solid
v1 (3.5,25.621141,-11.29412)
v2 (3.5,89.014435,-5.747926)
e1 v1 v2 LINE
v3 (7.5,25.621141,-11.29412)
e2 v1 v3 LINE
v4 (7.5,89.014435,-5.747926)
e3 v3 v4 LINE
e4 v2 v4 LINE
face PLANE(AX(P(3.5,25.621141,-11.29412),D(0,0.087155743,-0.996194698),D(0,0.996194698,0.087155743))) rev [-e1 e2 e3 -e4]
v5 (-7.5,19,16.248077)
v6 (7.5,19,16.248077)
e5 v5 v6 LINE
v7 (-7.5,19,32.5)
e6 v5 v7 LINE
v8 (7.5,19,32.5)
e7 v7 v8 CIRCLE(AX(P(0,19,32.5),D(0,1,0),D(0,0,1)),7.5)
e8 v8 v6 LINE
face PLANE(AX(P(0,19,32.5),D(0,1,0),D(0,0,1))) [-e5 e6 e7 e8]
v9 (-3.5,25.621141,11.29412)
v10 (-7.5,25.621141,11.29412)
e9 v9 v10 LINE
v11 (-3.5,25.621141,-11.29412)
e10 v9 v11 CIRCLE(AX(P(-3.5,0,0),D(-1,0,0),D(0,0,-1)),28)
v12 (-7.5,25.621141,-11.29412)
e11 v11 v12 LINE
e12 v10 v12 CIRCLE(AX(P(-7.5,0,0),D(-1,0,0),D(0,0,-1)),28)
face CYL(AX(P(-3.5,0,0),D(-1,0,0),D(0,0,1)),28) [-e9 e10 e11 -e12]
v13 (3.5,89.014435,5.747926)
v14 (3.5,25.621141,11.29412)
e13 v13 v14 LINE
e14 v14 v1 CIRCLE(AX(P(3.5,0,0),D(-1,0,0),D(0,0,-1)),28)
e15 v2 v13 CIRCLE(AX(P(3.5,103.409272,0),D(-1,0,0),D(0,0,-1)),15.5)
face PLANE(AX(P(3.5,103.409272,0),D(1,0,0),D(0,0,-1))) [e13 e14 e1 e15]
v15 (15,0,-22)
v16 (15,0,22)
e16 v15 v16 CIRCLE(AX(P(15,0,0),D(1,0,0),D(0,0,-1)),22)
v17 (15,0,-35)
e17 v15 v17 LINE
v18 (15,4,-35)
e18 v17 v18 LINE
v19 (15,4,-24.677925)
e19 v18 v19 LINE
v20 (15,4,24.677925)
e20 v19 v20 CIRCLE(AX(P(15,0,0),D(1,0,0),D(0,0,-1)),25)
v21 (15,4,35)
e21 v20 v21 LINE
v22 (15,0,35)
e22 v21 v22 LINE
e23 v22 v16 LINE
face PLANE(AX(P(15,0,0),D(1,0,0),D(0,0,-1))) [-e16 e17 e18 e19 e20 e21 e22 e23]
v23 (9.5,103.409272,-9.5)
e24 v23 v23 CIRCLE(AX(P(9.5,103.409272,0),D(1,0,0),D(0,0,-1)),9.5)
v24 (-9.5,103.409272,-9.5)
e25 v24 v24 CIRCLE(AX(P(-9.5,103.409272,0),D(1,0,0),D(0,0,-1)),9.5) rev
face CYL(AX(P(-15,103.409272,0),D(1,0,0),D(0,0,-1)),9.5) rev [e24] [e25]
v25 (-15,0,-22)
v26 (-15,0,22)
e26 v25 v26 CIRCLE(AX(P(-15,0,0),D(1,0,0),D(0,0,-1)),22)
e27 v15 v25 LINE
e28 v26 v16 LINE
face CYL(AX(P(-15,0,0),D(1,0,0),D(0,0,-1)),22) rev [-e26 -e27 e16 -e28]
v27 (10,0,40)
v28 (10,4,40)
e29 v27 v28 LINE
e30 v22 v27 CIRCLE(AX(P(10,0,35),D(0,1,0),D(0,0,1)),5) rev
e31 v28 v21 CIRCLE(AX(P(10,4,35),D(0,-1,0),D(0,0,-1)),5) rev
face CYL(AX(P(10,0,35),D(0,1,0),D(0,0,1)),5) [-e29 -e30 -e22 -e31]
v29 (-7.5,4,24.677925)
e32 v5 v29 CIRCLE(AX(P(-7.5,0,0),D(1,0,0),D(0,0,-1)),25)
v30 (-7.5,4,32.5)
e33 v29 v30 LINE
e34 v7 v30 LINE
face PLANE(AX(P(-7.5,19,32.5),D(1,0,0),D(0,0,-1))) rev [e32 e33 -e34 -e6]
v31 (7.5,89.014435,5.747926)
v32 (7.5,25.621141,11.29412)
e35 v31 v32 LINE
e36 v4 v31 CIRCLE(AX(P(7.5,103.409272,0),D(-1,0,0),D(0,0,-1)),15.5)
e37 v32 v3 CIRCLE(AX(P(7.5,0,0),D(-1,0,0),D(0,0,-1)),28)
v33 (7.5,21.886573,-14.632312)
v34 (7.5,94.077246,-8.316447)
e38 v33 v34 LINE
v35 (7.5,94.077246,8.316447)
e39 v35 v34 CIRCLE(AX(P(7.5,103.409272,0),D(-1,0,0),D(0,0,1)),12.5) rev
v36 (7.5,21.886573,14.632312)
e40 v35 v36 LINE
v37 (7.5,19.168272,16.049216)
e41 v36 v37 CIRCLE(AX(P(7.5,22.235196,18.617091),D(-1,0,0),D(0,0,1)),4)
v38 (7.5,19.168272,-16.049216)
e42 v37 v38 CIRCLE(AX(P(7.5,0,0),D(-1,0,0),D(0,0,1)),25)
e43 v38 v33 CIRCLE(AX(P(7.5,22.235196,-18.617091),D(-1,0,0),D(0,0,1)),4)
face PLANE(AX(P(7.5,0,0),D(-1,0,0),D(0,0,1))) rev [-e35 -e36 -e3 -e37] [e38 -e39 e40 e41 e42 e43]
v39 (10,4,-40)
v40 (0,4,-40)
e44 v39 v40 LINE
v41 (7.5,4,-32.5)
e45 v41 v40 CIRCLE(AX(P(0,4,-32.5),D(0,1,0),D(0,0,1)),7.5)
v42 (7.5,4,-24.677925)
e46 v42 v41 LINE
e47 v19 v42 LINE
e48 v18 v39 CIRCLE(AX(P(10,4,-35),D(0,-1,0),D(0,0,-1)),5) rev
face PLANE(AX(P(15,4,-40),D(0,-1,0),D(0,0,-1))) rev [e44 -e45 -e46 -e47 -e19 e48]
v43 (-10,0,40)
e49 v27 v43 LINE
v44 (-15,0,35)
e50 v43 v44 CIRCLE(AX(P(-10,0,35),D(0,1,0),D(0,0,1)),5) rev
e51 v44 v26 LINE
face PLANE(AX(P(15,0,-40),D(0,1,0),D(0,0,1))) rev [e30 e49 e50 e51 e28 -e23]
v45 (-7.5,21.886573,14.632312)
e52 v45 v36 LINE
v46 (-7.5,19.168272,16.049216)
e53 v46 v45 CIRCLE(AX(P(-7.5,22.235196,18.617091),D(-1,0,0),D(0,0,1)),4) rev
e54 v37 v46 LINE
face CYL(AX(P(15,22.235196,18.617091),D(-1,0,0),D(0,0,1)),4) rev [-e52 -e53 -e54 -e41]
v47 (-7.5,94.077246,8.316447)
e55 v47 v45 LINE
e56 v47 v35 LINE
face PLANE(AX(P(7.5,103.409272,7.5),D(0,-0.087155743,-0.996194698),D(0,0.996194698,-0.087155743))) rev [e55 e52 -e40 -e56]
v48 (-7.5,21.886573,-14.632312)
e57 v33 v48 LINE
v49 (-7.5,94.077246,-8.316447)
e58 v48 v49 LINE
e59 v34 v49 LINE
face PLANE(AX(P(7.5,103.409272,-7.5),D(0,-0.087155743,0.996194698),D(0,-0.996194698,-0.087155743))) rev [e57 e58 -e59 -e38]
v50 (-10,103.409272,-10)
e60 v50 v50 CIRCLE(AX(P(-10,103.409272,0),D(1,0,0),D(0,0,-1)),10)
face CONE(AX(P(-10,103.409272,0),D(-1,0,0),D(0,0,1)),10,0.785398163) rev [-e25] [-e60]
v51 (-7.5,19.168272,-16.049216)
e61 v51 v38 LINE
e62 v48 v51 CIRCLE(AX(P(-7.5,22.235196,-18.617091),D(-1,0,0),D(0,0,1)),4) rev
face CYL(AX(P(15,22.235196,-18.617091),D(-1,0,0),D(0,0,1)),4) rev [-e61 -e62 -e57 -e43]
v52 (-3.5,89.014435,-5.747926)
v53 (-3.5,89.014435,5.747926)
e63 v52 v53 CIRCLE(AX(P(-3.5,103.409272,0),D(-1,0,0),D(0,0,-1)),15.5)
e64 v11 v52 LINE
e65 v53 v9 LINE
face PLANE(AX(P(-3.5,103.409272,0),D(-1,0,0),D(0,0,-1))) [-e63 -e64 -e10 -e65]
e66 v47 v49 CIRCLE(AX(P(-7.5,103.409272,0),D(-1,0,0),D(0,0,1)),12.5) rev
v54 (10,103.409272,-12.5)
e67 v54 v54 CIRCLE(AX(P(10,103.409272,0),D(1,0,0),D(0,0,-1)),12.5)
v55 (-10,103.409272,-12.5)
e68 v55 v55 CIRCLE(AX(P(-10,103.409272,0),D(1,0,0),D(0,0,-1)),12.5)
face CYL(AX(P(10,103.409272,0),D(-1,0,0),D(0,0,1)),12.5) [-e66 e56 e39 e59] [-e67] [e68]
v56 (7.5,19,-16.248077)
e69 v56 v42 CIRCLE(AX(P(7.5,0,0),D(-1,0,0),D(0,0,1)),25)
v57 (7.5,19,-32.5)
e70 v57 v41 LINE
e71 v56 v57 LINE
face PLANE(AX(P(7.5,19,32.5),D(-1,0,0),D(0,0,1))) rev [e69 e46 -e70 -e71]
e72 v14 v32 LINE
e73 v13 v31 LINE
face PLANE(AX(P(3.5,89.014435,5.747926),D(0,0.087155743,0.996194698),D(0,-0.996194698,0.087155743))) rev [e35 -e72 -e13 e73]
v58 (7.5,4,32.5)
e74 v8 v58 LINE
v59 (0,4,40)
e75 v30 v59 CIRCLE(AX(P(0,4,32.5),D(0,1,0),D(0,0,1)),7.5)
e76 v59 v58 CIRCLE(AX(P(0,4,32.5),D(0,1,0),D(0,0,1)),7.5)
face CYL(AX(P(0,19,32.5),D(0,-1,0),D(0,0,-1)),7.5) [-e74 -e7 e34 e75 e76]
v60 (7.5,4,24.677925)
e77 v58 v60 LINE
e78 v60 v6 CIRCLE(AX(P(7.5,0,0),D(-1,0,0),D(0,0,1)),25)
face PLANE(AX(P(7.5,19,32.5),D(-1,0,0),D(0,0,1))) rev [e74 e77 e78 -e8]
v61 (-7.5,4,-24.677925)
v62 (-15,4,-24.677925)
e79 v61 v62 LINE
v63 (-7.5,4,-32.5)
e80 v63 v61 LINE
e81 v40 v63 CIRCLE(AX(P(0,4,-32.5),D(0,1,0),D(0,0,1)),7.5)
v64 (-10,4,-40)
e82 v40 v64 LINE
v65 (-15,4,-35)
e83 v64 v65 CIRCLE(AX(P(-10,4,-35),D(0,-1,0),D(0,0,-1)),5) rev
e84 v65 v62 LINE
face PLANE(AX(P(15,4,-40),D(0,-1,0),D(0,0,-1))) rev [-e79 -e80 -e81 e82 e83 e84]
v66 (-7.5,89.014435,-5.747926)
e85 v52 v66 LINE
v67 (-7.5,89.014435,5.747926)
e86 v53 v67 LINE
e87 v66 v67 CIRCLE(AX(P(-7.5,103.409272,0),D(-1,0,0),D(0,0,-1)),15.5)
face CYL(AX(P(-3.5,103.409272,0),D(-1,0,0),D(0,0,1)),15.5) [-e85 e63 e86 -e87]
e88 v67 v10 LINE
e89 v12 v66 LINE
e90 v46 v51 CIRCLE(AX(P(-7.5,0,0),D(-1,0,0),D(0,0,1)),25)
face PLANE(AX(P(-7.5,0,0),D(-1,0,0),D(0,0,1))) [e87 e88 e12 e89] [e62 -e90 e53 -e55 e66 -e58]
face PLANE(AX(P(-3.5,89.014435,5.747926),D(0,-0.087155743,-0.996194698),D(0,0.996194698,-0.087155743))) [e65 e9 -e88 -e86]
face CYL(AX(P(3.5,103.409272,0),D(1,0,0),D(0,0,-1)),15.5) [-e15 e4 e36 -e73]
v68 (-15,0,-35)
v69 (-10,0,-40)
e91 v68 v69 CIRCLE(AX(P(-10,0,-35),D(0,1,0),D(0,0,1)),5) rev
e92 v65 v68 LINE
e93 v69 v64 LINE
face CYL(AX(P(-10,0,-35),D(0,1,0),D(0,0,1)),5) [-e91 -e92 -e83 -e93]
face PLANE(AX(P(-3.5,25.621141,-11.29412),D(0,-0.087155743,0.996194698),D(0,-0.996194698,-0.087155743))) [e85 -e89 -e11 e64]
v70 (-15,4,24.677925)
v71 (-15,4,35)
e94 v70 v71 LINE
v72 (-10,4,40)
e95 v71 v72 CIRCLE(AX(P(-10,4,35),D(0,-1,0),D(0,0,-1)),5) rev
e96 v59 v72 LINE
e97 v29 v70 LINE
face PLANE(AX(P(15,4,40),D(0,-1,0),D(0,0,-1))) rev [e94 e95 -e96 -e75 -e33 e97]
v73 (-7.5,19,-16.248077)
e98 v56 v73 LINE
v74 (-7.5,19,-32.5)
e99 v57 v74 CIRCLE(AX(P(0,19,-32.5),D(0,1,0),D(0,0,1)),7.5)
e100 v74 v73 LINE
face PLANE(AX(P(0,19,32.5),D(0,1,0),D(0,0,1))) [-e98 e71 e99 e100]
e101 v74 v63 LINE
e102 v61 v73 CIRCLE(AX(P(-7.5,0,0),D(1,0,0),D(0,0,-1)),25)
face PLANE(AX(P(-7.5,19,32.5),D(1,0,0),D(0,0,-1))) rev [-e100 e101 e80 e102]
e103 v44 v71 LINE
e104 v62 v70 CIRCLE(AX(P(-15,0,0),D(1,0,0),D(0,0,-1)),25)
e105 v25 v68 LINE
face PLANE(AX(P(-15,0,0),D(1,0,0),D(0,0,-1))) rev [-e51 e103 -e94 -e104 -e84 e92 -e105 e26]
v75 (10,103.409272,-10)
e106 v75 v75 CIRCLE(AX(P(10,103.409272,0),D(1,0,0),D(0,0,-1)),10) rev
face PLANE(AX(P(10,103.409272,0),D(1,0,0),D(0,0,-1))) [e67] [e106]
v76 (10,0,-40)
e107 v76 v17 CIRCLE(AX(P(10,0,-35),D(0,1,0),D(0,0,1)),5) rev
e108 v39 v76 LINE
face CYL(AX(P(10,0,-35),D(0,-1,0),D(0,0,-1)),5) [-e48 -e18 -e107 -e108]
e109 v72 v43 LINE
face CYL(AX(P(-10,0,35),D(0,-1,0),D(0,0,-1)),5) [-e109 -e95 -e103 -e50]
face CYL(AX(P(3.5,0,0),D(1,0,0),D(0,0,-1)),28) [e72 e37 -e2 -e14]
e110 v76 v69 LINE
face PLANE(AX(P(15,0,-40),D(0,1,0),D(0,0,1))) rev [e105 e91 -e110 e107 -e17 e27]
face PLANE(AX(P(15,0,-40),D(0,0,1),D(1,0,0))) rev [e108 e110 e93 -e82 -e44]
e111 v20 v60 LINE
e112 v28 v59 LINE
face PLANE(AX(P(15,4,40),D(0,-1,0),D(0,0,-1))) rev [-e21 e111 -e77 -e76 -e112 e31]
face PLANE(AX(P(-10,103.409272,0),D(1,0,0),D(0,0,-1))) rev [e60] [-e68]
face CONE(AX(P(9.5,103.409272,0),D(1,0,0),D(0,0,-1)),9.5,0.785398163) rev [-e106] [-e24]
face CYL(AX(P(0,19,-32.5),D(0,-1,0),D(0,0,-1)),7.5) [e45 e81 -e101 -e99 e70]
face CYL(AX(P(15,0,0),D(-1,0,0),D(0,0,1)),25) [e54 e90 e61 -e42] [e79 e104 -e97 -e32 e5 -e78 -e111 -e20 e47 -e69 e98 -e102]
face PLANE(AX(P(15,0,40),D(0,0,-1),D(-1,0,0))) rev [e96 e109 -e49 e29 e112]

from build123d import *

# Parameters (mm, degrees)
BOSS_EXTRUDE1_DEPTH     = 15
BOSS_EXTRUDE2_DEPTH     = 7.5
SKETCH5_R               = 12.5
BOSS_EXTRUDE3_DEPTH     = 10
BOSS_EXTRUDE4_DEPTH     = 15
CUT_EXTRUDE2_DEPTH      = 126.139759491
CUT_EXTRUDE2_DEPTH_BACK = 126.139759491
SKETCH7_R               = 22
SKETCH7_R_2             = 9.5
CUT_EXTRUDE3_DEPTH      = 4
CHAMFER1_SIZE           = 0.5
FILLET1_R               = 5
FILLET2_R               = 4


with BuildPart() as part:
    # Sketch3 → Boss-Extrude1 (new, symmetric)
    with BuildSketch(Plane(origin=(0, 0, 0), x_dir=(0, 0, -1), z_dir=(1, 0, 0))):
        with BuildLine():
            Line((40, 0), (-40, 0))
            Line((-40, 0), (-40, 4))
            Line((-40, 4), (-24.677925359, 4))
            ThreePointArc((-24.677925359, 4), (0, 25), (24.677925359, 4))
            Line((24.677925359, 4), (40, 4))
            Line((40, 4), (40, 0))
        make_face()
    extrude(amount=BOSS_EXTRUDE1_DEPTH, both=True)

    # Sketch4 → Boss-Extrude2 (add, symmetric)
    with BuildSketch(Plane(origin=(0, 0, 0), x_dir=(0, 0, -1), z_dir=(1, 0, 0))):
        Polygon((7.5, 103.409272302), (16.54713903, 0), (-16.54713903, 0), (-7.5, 103.409272302), align=None)
    extrude(amount=BOSS_EXTRUDE2_DEPTH, both=True)

    # Sketch5 → Boss-Extrude3 (add, symmetric)
    with BuildSketch(Plane(origin=(0, 0, 0), x_dir=(0, 0, -1), z_dir=(1, 0, 0))):
        with Locations((0, 103.409272302)):
            Circle(SKETCH5_R)
    extrude(amount=BOSS_EXTRUDE3_DEPTH, both=True)

    # Sketch6 → Boss-Extrude4 (add)
    with BuildSketch(Plane(origin=(0, 4, 0), x_dir=(1, 0, 0), z_dir=(0, 1, 0))):
        with BuildLine():
            Line((-7.5, -32.5), (-7.5, 32.5))
            ThreePointArc((-7.5, 32.5), (0, 40), (7.5, 32.5))
            Line((7.5, 32.5), (7.5, -32.5))
            ThreePointArc((7.5, -32.5), (0, -40), (-7.5, -32.5))
        make_face()
    extrude(amount=BOSS_EXTRUDE4_DEPTH)

    # Sketch7 → Cut-Extrude2 (cut, two sides: drawn at the far end of the back side and taken through both)
    with BuildSketch(Plane(origin=(10, 0, 0), x_dir=(0, 0, -1), z_dir=(1, 0, 0)).offset(-CUT_EXTRUDE2_DEPTH_BACK)):
        Circle(SKETCH7_R)
        with Locations((0, 103.409272302)):
            Circle(SKETCH7_R_2)
    extrude(amount=CUT_EXTRUDE2_DEPTH + CUT_EXTRUDE2_DEPTH_BACK, mode=Mode.SUBTRACT)

    # Sketch13 → Cut-Extrude3 (cut)
    with BuildSketch(Plane(origin=(7.5, 0, 0), x_dir=(0, 0, -1), z_dir=(1, 0, 0))):
        with BuildLine():
            Line((-5.747925596, 89.014434639), (-11.294120161, 25.621140681))
            ThreePointArc((-11.294120161, 25.621140681), (0, 28), (11.294120161, 25.621140681))
            Line((11.294120161, 25.621140681), (5.747925596, 89.014434639))
            ThreePointArc((5.747925596, 89.014434639), (0, 87.909272302), (-5.747925596, 89.014434639))
        make_face()
    cut_extrude3 = extrude(amount=-CUT_EXTRUDE3_DEPTH, mode=Mode.SUBTRACT)

    # Mirror1: Cut-Extrude3 across plane
    add(cut_extrude3.mirror(Plane(origin=(0, 0, 0), x_dir=(0, 0, 1), z_dir=(1, 0, 0))), mode=Mode.SUBTRACT)

    # Chamfer1
    chamfer1_edges = [part.edges().sort_by_distance(p)[0] for p in [
        (10, 103.409272302, 9.5),
        (-10, 103.409272302, 9.5),
    ]]
    chamfer(chamfer1_edges, length=CHAMFER1_SIZE)

    # Fillet1
    fillet1_edges = [part.edges().sort_by_distance(p)[0] for p in [
        (15, 2, 40),
        (15, 2, -40),
        (-15, 2, -40),
        (-15, 2, 40),
    ]]
    fillet(fillet1_edges, radius=FILLET1_R)

    # Fillet2
    fillet2_edges = [part.edges().sort_by_distance(p)[0] for p in [
        (0, 20.16070078, 14.783306263),
        (0, 20.16070078, -14.783306263),
    ]]
    fillet(fillet2_edges, radius=FILLET2_R)


solid = part.part
